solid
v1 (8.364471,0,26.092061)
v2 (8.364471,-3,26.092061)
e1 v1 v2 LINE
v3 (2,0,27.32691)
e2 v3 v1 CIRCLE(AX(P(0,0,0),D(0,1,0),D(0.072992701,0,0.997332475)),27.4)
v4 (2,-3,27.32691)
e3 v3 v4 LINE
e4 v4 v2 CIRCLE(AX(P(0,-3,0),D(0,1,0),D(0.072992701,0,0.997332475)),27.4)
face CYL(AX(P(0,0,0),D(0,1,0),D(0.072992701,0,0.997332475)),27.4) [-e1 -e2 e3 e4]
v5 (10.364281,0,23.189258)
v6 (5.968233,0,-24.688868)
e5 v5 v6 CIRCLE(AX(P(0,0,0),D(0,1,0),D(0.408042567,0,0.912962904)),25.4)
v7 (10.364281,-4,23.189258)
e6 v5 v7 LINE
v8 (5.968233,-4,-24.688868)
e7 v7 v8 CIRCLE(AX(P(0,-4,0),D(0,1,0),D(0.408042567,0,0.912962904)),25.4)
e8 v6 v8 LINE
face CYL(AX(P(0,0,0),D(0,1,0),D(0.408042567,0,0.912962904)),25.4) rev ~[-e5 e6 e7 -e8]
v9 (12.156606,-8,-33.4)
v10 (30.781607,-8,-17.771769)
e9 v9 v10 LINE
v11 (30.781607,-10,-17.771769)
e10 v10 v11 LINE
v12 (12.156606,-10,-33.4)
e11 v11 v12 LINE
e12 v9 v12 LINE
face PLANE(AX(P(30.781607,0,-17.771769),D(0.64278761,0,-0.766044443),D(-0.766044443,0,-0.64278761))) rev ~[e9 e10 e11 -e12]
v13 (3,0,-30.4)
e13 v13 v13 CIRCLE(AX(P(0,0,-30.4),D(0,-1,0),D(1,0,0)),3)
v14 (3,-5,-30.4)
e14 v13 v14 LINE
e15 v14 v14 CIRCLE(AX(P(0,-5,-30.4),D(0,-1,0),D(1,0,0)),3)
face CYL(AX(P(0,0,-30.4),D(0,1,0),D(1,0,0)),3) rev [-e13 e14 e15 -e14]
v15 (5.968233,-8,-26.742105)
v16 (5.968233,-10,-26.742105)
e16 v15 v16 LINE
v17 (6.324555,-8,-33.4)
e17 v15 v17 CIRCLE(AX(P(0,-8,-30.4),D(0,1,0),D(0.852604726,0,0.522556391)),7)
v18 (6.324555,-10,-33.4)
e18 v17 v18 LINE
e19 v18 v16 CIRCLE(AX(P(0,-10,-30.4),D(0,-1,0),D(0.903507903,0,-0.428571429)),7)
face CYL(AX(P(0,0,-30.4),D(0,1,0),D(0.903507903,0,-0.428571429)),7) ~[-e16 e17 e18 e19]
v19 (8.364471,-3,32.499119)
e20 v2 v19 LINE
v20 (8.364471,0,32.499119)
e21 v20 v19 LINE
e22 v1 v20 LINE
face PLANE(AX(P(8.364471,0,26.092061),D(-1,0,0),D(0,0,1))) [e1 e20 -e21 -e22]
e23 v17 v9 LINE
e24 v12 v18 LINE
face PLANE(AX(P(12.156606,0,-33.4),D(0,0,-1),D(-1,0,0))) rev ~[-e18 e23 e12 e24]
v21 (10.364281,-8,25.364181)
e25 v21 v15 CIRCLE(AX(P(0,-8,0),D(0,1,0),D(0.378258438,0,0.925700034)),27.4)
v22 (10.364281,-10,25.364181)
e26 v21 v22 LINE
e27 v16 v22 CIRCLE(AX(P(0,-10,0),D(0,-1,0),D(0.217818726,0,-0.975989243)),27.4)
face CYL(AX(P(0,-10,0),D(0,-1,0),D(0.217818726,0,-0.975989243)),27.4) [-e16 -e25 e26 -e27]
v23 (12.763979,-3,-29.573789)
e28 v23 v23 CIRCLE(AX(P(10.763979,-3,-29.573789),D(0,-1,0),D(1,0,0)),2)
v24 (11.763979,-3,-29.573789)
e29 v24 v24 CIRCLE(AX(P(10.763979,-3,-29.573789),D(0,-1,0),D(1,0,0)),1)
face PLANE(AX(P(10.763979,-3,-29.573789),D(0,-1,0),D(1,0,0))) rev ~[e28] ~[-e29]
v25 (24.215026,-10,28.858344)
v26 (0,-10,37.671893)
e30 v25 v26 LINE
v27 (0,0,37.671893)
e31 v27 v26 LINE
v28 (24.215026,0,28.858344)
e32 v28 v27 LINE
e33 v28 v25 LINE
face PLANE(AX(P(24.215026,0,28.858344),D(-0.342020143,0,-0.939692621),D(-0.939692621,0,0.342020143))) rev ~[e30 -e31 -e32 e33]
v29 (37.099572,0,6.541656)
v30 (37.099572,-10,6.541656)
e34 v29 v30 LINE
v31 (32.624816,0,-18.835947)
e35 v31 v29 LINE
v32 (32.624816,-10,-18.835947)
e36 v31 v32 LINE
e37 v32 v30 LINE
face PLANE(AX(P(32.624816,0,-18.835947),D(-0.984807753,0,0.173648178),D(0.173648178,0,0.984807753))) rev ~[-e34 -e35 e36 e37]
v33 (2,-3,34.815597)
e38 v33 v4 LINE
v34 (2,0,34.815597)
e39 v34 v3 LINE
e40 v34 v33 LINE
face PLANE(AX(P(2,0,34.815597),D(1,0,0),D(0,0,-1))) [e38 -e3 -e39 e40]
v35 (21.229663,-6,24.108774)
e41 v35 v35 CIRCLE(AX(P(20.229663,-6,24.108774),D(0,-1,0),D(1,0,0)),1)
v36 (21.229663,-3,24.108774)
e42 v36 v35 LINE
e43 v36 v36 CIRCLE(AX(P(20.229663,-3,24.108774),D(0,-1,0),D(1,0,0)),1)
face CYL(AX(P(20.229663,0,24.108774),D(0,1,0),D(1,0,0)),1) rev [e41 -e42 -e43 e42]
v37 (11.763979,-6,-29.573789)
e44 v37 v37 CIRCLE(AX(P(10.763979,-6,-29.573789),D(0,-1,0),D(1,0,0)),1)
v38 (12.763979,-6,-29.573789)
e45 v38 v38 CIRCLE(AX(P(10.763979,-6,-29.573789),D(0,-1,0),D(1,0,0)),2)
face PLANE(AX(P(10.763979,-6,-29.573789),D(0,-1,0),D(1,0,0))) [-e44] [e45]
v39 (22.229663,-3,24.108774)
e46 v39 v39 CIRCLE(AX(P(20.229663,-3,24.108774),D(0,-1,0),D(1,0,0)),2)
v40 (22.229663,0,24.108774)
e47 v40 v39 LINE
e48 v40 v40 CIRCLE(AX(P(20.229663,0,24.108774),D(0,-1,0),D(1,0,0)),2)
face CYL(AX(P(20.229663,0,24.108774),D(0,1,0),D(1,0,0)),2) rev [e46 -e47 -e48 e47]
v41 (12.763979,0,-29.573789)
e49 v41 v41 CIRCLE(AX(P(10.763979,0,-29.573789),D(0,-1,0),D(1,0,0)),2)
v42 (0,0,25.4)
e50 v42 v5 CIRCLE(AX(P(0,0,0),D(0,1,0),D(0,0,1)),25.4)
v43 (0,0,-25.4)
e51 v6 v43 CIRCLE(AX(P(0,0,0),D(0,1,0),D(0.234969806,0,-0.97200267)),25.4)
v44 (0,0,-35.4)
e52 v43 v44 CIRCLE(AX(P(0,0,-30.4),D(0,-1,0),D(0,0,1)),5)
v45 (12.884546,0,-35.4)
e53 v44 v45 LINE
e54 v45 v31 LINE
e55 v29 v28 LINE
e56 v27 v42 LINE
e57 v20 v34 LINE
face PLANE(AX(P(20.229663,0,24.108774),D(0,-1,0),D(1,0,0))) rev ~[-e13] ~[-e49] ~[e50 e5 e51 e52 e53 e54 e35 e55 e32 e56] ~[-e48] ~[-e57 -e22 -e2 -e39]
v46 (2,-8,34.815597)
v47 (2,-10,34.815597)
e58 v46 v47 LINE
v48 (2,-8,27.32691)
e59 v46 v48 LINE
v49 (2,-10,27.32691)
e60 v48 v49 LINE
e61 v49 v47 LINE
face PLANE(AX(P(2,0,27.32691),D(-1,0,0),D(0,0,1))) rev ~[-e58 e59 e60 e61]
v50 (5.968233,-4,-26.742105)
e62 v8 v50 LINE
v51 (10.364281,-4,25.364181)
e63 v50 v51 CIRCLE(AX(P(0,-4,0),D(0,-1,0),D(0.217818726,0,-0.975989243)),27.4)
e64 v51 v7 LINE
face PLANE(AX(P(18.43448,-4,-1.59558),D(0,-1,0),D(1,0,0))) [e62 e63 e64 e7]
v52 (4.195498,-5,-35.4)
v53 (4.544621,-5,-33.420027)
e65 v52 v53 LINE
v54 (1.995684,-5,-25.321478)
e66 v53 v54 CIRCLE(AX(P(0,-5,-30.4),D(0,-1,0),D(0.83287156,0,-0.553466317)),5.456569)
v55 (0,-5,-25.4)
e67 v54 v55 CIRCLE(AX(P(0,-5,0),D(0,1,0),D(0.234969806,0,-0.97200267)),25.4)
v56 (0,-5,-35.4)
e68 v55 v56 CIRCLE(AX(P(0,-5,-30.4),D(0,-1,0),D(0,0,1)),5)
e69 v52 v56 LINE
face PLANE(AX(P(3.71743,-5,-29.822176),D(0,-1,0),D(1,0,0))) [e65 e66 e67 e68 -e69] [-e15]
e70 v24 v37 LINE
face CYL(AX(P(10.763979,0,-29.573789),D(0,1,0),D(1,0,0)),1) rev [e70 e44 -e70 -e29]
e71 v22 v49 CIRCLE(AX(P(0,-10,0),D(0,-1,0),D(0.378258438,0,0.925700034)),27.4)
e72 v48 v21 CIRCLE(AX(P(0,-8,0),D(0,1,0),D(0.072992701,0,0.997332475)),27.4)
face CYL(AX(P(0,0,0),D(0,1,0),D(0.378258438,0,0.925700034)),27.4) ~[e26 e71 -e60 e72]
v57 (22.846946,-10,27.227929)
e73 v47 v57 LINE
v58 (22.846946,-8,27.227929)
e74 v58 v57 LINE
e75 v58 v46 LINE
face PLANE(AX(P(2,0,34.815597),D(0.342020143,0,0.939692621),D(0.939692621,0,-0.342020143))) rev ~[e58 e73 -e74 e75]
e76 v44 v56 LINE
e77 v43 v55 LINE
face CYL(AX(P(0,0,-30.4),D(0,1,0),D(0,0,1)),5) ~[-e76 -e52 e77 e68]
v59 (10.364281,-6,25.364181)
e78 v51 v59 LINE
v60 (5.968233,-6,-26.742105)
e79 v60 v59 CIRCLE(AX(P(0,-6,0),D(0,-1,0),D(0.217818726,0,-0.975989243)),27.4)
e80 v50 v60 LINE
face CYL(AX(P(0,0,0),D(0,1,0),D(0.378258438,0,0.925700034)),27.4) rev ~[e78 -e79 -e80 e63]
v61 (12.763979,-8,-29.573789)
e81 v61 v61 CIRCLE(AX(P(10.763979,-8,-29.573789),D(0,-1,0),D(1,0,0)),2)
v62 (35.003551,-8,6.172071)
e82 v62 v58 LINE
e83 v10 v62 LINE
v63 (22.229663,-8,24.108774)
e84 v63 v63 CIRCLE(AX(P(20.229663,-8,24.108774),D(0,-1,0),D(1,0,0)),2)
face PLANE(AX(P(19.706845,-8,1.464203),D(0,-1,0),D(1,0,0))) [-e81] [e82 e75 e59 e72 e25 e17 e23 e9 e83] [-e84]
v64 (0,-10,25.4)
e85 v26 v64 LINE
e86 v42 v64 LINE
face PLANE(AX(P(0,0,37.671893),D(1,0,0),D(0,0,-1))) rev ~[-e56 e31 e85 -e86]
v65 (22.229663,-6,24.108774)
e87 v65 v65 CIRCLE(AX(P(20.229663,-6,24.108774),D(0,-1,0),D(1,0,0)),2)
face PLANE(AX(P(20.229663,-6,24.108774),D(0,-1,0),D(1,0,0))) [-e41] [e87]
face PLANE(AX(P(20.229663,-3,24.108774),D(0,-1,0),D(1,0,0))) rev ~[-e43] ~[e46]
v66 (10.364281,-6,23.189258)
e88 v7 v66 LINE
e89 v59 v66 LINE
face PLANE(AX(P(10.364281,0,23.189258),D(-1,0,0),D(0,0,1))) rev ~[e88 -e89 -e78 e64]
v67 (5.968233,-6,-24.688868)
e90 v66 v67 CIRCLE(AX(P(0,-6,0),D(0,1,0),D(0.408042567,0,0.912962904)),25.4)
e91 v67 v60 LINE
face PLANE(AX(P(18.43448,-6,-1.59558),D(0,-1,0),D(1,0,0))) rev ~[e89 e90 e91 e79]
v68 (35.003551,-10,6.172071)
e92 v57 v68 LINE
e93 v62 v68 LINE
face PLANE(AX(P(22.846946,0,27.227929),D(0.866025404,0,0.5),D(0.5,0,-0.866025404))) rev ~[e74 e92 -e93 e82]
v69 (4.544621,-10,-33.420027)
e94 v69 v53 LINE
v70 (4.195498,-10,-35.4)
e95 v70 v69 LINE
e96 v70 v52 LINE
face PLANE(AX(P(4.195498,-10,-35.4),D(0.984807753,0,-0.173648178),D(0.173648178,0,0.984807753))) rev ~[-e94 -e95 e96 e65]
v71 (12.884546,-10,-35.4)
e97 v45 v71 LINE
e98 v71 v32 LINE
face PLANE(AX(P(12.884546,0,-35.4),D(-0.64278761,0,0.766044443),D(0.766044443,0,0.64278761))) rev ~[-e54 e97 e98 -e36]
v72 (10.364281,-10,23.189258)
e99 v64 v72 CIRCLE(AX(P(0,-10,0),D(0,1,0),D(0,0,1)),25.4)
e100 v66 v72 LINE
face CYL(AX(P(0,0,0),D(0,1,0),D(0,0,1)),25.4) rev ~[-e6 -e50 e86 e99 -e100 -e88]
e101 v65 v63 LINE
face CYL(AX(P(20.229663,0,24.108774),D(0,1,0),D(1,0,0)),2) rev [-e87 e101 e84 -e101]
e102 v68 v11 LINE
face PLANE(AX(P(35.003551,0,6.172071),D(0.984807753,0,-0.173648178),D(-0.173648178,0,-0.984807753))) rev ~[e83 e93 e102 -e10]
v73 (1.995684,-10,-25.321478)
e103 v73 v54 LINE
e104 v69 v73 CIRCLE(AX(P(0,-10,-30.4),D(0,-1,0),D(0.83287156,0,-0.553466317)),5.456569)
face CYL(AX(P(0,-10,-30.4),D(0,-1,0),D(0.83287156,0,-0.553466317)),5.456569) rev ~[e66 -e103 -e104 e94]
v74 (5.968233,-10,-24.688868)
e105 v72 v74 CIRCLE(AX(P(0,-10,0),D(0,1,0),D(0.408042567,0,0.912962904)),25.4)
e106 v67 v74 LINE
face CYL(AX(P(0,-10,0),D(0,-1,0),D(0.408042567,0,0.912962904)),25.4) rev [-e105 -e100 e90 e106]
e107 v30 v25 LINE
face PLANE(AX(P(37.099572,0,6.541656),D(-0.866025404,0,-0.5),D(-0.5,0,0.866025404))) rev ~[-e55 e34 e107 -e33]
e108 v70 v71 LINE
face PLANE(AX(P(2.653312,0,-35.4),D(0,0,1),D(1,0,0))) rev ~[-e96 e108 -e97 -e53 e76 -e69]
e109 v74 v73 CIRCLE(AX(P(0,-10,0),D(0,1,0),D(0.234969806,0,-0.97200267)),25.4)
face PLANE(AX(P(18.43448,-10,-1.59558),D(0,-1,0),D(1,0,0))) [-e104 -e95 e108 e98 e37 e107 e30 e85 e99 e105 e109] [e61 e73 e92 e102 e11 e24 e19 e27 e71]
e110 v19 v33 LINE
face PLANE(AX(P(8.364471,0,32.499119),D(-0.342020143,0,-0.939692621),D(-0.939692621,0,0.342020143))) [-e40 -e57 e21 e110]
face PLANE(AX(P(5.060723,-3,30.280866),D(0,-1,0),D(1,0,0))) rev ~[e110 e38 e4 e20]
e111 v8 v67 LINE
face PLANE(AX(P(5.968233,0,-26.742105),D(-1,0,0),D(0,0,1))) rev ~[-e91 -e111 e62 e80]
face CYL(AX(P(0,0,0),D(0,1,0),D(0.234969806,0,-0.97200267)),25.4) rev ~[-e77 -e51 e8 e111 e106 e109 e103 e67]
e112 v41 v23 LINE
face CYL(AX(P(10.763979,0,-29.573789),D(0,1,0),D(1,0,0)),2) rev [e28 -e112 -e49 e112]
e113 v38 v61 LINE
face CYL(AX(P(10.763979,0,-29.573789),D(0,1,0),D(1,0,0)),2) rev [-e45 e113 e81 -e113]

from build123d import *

# Parameters (mm, degrees)
F0_R      = 3
F1_DEPTH  = 5
F2_DEPTH  = 10
F0_R_2    = 2
F3_DEPTH  = 8
F4_DEPTH  = 4
F6_DEPTH  = 4
F0_R_3    = 1
F7_DEPTH  = 6
F9_DEPTH  = 5
F10_DEPTH = 3
F12_DEPTH = 3


with BuildPart() as f1:
    # F0 (on Front) → F1 (new body)
    with BuildSketch(Plane.XZ):
        with BuildLine():
            Line((0, -35.3999999996), (2.6533119314, -35.3999999996))
            ThreePointArc((2.6533119314, -35.3999999996), (4.384153616, -33.1616546164), (5, -30.3999999996))
            ThreePointArc((5, -30.3999999996), (3.5355339059, -26.8644660937), (0, -25.3999999997))
            ThreePointArc((0, -25.3999999997), (-4.9999999999, -30.3999999996), (0, -35.3999999996))
        make_face()
        with Locations((0, -30.3999999996)):
            Circle(F0_R, mode=Mode.SUBTRACT)
    extrude(amount=F1_DEPTH)

    # F0 (on Front) → F2 (join)
    with BuildSketch(Plane.XZ):
        with BuildLine():
            Line((2.6533119314, -35.3999999996), (12.8845462929, -35.3999999996))
            Line((12.8845462929, -35.3999999996), (32.6248164724, -18.8359465726))
            Line((32.6248164724, -18.8359465726), (37.09957244, 6.5416555939))
            Line((37.09957244, 6.5416555939), (24.2150261472, 28.8583444057))
            Line((24.2150261472, 28.8583444057), (0, 37.6718931452))
            Line((0, 37.6718931452), (0, 25.3999999997))
            ThreePointArc((0, 25.3999999997), (5.2987193342, 24.841166909), (10.3642812115, 23.1892577491))
            Line((10.3642812115, 23.1892577491), (10.3642812115, 25.3641809438))
            ThreePointArc((10.3642812115, 25.3641809438), (6.2595477971, 26.6754205469), (2, 27.326909814))
            Line((2, 27.326909814), (2, 34.8155971317))
            Line((2, 34.8155971317), (22.8469455738, 27.2279294674))
            Line((22.8469455738, 27.2279294674), (35.0035513982, 6.1720705321))
            Line((35.0035513982, 6.1720705321), (30.7816065022, -17.7717688002))
            Line((30.7816065022, -17.7717688002), (12.1566058243, -33.3999999997))
            Line((12.1566058243, -33.3999999997), (6.3245553202, -33.3999999997))
            ThreePointArc((6.3245553202, -33.3999999997), (6.9899965839, -30.0259040815), (5.9682330797, -26.7421052628))
            Line((5.9682330797, -26.7421052628), (5.9682330797, -24.6888678131))
            ThreePointArc((5.9682330797, -24.6888678131), (3.0052252445, -25.2215903784), (0, -25.3999999997))
            ThreePointArc((0, -25.3999999997), (3.5355339059, -26.8644660937), (5, -30.3999999996))
            ThreePointArc((5, -30.3999999996), (4.384153616, -33.1616546164), (2.6533119314, -35.3999999996))
        make_face()
    extrude(amount=F2_DEPTH)

    # F0 (on Front) → F3 (join)
    with BuildSketch(Plane.XZ):
        with BuildLine():
            ThreePointArc((10.3642812115, 25.3641809438), (27.3030038884, -2.3034710008), (5.9682330797, -26.7421052628))
            ThreePointArc((5.9682330797, -26.7421052628), (6.9899965839, -30.0259040815), (6.3245553202, -33.3999999997))
            Line((6.3245553202, -33.3999999997), (12.1566058243, -33.3999999997))
            Line((12.1566058243, -33.3999999997), (30.7816065022, -17.7717688002))
            Line((30.7816065022, -17.7717688002), (35.0035513982, 6.1720705321))
            Line((35.0035513982, 6.1720705321), (22.8469455738, 27.2279294674))
            Line((22.8469455738, 27.2279294674), (2, 34.8155971317))
            Line((2, 34.8155971317), (2, 27.326909814))
            ThreePointArc((2, 27.326909814), (6.2595477971, 26.6754205469), (10.3642812115, 25.3641809438))
        make_face()
        with Locations((10.7639788756, -29.5737889045)):
            Circle(F0_R_2, mode=Mode.SUBTRACT)
        with Locations((27.2553512828, -15.7358844)):
            Circle(F0_R_2, mode=Mode.SUBTRACT)
        with Locations((30.9936419152, 5.4650153001)):
            Circle(F0_R_2, mode=Mode.SUBTRACT)
        with Locations((20.2296630396, 24.1087736043)):
            Circle(F0_R_2, mode=Mode.SUBTRACT)
        with Locations((30.9936419152, 5.4650153001)):
            Circle(F0_R_2)
        with Locations((27.2553512828, -15.7358844)):
            Circle(F0_R_2)
    extrude(amount=F3_DEPTH)

    # F0 (on Front) → F4 (join)
    with BuildSketch(Plane.XZ):
        with BuildLine():
            ThreePointArc((10.3642812115, 23.1892577491), (25.2936055675, -2.3223947512), (5.9682330797, -24.6888678131))
            Line((5.9682330797, -24.6888678131), (5.9682330797, -26.7421052628))
            ThreePointArc((5.9682330797, -26.7421052628), (27.3030038884, -2.3034710008), (10.3642812115, 25.3641809438))
            Line((10.3642812115, 25.3641809438), (10.3642812115, 23.1892577491))
        make_face()
    extrude(amount=F4_DEPTH)

    # F5 (on face) → F6 (join)
    with BuildSketch(Plane.XZ.offset(10)):
        with BuildLine():
            ThreePointArc((10.3642812115, 23.1892577491), (25.2936055675, -2.3223947512), (5.9682330797, -24.6888678131))
            Line((5.9682330797, -24.6888678131), (5.9682330797, -26.7421052628))
            ThreePointArc((5.9682330797, -26.7421052628), (27.3030038884, -2.3034710008), (10.3642812115, 25.3641809438))
            Line((10.3642812115, 25.3641809438), (10.3642812115, 23.1892577491))
        make_face()
    extrude(amount=-F6_DEPTH)

    # F0 (on Front) → F7 (join)
    with BuildSketch(Plane.XZ):
        with Locations((20.2296630396, 24.1087736043)):
            Circle(F0_R_2)
        with Locations((20.2296630396, 24.1087736043)):
            Circle(F0_R_3, mode=Mode.SUBTRACT)
        with Locations((10.7639788756, -29.5737889045)):
            Circle(F0_R_2)
        with Locations((10.7639788756, -29.5737889045)):
            Circle(F0_R_3, mode=Mode.SUBTRACT)
    extrude(amount=F7_DEPTH)

    # F8 (on face) → F9 (cut)
    with BuildSketch(Plane.XZ.offset(10)):
        with BuildLine():
            Line((2.6535725711, -35.3997834846), (4.1954981558, -35.3999999996))
            Line((4.1954981558, -35.3999999996), (4.5446208272, -33.4200269408))
            ThreePointArc((4.5446208272, -33.4200269408), (5.2048555211, -28.7618241261), (1.9956840643, -25.3214779407))
            ThreePointArc((1.9956840643, -25.3214779407), (0.9986141145, -25.3803618933), (0, -25.3999999997))
            ThreePointArc((0, -25.3999999997), (3.5355339059, -26.8644660937), (5, -30.3999999996))
            ThreePointArc((5, -30.3999999996), (4.9127701426, -31.4613100854), (4.6534218159, -32.4941346551))
            ThreePointArc((4.6534218159, -32.4941346551), (3.854365705, -34.0852093419), (2.6535725711, -35.3997834846))
        make_face()
        with BuildLine():
            Line((2.6533119314, -35.3999999996), (4.1954981558, -35.3999999996))
            Line((4.1954981558, -35.3999999996), (2.6535725711, -35.3997834846))
            ThreePointArc((2.6535725711, -35.3997834846), (2.6534422527, -35.3998917438), (2.6533119314, -35.3999999996))
        make_face()
        with BuildLine():
            Line((0.0760534773, -35.399421553), (2.6535725711, -35.3997834846))
            ThreePointArc((2.6535725711, -35.3997834846), (3.854365705, -34.0852093419), (4.6534218159, -32.4941346551))
            ThreePointArc((4.6534218159, -32.4941346551), (4.9127701426, -31.4613100854), (5, -30.3999999996))
            ThreePointArc((5, -30.3999999996), (3.5623213911, -33.9085419057), (0.0760534773, -35.399421553))
        make_face()
        with BuildLine():
            ThreePointArc((0, -25.3999999997), (0.9986141145, -25.3803618933), (1.9956840643, -25.3214779407))
            ThreePointArc((1.9956840643, -25.3214779407), (1.0155877723, -25.0387760102), (0, -24.943431372))
            Line((0, -24.943431372), (0, -25.3999999997))
        make_face()
    extrude(amount=-F9_DEPTH, mode=Mode.SUBTRACT)

    # F0 (on Front) → F10 (cut)
    with BuildSketch(Plane.XZ):
        with Locations((20.2296630396, 24.1087736043)):
            Circle(F0_R_2)
        with Locations((20.2296630396, 24.1087736043)):
            Circle(F0_R_3, mode=Mode.SUBTRACT)
        with Locations((10.7639788756, -29.5737889045)):
            Circle(F0_R_2)
        with Locations((10.7639788756, -29.5737889045)):
            Circle(F0_R_3, mode=Mode.SUBTRACT)
    extrude(amount=F10_DEPTH, mode=Mode.SUBTRACT)

    # F11 (on face) → F12 (cut)
    with BuildSketch(Plane.XZ):
        with BuildLine():
            Line((8.3644706756, 32.4991192489), (2, 34.8155971317))
            Line((2, 34.8155971317), (2, 27.326909814))
            ThreePointArc((2, 27.326909814), (5.2188864899, 26.8983870108), (8.3644706756, 26.0920606756))
            Line((8.3644706756, 26.0920606756), (8.3644706756, 32.4991192489))
        make_face()
    extrude(amount=F12_DEPTH, mode=Mode.SUBTRACT)


solid = f1.part
